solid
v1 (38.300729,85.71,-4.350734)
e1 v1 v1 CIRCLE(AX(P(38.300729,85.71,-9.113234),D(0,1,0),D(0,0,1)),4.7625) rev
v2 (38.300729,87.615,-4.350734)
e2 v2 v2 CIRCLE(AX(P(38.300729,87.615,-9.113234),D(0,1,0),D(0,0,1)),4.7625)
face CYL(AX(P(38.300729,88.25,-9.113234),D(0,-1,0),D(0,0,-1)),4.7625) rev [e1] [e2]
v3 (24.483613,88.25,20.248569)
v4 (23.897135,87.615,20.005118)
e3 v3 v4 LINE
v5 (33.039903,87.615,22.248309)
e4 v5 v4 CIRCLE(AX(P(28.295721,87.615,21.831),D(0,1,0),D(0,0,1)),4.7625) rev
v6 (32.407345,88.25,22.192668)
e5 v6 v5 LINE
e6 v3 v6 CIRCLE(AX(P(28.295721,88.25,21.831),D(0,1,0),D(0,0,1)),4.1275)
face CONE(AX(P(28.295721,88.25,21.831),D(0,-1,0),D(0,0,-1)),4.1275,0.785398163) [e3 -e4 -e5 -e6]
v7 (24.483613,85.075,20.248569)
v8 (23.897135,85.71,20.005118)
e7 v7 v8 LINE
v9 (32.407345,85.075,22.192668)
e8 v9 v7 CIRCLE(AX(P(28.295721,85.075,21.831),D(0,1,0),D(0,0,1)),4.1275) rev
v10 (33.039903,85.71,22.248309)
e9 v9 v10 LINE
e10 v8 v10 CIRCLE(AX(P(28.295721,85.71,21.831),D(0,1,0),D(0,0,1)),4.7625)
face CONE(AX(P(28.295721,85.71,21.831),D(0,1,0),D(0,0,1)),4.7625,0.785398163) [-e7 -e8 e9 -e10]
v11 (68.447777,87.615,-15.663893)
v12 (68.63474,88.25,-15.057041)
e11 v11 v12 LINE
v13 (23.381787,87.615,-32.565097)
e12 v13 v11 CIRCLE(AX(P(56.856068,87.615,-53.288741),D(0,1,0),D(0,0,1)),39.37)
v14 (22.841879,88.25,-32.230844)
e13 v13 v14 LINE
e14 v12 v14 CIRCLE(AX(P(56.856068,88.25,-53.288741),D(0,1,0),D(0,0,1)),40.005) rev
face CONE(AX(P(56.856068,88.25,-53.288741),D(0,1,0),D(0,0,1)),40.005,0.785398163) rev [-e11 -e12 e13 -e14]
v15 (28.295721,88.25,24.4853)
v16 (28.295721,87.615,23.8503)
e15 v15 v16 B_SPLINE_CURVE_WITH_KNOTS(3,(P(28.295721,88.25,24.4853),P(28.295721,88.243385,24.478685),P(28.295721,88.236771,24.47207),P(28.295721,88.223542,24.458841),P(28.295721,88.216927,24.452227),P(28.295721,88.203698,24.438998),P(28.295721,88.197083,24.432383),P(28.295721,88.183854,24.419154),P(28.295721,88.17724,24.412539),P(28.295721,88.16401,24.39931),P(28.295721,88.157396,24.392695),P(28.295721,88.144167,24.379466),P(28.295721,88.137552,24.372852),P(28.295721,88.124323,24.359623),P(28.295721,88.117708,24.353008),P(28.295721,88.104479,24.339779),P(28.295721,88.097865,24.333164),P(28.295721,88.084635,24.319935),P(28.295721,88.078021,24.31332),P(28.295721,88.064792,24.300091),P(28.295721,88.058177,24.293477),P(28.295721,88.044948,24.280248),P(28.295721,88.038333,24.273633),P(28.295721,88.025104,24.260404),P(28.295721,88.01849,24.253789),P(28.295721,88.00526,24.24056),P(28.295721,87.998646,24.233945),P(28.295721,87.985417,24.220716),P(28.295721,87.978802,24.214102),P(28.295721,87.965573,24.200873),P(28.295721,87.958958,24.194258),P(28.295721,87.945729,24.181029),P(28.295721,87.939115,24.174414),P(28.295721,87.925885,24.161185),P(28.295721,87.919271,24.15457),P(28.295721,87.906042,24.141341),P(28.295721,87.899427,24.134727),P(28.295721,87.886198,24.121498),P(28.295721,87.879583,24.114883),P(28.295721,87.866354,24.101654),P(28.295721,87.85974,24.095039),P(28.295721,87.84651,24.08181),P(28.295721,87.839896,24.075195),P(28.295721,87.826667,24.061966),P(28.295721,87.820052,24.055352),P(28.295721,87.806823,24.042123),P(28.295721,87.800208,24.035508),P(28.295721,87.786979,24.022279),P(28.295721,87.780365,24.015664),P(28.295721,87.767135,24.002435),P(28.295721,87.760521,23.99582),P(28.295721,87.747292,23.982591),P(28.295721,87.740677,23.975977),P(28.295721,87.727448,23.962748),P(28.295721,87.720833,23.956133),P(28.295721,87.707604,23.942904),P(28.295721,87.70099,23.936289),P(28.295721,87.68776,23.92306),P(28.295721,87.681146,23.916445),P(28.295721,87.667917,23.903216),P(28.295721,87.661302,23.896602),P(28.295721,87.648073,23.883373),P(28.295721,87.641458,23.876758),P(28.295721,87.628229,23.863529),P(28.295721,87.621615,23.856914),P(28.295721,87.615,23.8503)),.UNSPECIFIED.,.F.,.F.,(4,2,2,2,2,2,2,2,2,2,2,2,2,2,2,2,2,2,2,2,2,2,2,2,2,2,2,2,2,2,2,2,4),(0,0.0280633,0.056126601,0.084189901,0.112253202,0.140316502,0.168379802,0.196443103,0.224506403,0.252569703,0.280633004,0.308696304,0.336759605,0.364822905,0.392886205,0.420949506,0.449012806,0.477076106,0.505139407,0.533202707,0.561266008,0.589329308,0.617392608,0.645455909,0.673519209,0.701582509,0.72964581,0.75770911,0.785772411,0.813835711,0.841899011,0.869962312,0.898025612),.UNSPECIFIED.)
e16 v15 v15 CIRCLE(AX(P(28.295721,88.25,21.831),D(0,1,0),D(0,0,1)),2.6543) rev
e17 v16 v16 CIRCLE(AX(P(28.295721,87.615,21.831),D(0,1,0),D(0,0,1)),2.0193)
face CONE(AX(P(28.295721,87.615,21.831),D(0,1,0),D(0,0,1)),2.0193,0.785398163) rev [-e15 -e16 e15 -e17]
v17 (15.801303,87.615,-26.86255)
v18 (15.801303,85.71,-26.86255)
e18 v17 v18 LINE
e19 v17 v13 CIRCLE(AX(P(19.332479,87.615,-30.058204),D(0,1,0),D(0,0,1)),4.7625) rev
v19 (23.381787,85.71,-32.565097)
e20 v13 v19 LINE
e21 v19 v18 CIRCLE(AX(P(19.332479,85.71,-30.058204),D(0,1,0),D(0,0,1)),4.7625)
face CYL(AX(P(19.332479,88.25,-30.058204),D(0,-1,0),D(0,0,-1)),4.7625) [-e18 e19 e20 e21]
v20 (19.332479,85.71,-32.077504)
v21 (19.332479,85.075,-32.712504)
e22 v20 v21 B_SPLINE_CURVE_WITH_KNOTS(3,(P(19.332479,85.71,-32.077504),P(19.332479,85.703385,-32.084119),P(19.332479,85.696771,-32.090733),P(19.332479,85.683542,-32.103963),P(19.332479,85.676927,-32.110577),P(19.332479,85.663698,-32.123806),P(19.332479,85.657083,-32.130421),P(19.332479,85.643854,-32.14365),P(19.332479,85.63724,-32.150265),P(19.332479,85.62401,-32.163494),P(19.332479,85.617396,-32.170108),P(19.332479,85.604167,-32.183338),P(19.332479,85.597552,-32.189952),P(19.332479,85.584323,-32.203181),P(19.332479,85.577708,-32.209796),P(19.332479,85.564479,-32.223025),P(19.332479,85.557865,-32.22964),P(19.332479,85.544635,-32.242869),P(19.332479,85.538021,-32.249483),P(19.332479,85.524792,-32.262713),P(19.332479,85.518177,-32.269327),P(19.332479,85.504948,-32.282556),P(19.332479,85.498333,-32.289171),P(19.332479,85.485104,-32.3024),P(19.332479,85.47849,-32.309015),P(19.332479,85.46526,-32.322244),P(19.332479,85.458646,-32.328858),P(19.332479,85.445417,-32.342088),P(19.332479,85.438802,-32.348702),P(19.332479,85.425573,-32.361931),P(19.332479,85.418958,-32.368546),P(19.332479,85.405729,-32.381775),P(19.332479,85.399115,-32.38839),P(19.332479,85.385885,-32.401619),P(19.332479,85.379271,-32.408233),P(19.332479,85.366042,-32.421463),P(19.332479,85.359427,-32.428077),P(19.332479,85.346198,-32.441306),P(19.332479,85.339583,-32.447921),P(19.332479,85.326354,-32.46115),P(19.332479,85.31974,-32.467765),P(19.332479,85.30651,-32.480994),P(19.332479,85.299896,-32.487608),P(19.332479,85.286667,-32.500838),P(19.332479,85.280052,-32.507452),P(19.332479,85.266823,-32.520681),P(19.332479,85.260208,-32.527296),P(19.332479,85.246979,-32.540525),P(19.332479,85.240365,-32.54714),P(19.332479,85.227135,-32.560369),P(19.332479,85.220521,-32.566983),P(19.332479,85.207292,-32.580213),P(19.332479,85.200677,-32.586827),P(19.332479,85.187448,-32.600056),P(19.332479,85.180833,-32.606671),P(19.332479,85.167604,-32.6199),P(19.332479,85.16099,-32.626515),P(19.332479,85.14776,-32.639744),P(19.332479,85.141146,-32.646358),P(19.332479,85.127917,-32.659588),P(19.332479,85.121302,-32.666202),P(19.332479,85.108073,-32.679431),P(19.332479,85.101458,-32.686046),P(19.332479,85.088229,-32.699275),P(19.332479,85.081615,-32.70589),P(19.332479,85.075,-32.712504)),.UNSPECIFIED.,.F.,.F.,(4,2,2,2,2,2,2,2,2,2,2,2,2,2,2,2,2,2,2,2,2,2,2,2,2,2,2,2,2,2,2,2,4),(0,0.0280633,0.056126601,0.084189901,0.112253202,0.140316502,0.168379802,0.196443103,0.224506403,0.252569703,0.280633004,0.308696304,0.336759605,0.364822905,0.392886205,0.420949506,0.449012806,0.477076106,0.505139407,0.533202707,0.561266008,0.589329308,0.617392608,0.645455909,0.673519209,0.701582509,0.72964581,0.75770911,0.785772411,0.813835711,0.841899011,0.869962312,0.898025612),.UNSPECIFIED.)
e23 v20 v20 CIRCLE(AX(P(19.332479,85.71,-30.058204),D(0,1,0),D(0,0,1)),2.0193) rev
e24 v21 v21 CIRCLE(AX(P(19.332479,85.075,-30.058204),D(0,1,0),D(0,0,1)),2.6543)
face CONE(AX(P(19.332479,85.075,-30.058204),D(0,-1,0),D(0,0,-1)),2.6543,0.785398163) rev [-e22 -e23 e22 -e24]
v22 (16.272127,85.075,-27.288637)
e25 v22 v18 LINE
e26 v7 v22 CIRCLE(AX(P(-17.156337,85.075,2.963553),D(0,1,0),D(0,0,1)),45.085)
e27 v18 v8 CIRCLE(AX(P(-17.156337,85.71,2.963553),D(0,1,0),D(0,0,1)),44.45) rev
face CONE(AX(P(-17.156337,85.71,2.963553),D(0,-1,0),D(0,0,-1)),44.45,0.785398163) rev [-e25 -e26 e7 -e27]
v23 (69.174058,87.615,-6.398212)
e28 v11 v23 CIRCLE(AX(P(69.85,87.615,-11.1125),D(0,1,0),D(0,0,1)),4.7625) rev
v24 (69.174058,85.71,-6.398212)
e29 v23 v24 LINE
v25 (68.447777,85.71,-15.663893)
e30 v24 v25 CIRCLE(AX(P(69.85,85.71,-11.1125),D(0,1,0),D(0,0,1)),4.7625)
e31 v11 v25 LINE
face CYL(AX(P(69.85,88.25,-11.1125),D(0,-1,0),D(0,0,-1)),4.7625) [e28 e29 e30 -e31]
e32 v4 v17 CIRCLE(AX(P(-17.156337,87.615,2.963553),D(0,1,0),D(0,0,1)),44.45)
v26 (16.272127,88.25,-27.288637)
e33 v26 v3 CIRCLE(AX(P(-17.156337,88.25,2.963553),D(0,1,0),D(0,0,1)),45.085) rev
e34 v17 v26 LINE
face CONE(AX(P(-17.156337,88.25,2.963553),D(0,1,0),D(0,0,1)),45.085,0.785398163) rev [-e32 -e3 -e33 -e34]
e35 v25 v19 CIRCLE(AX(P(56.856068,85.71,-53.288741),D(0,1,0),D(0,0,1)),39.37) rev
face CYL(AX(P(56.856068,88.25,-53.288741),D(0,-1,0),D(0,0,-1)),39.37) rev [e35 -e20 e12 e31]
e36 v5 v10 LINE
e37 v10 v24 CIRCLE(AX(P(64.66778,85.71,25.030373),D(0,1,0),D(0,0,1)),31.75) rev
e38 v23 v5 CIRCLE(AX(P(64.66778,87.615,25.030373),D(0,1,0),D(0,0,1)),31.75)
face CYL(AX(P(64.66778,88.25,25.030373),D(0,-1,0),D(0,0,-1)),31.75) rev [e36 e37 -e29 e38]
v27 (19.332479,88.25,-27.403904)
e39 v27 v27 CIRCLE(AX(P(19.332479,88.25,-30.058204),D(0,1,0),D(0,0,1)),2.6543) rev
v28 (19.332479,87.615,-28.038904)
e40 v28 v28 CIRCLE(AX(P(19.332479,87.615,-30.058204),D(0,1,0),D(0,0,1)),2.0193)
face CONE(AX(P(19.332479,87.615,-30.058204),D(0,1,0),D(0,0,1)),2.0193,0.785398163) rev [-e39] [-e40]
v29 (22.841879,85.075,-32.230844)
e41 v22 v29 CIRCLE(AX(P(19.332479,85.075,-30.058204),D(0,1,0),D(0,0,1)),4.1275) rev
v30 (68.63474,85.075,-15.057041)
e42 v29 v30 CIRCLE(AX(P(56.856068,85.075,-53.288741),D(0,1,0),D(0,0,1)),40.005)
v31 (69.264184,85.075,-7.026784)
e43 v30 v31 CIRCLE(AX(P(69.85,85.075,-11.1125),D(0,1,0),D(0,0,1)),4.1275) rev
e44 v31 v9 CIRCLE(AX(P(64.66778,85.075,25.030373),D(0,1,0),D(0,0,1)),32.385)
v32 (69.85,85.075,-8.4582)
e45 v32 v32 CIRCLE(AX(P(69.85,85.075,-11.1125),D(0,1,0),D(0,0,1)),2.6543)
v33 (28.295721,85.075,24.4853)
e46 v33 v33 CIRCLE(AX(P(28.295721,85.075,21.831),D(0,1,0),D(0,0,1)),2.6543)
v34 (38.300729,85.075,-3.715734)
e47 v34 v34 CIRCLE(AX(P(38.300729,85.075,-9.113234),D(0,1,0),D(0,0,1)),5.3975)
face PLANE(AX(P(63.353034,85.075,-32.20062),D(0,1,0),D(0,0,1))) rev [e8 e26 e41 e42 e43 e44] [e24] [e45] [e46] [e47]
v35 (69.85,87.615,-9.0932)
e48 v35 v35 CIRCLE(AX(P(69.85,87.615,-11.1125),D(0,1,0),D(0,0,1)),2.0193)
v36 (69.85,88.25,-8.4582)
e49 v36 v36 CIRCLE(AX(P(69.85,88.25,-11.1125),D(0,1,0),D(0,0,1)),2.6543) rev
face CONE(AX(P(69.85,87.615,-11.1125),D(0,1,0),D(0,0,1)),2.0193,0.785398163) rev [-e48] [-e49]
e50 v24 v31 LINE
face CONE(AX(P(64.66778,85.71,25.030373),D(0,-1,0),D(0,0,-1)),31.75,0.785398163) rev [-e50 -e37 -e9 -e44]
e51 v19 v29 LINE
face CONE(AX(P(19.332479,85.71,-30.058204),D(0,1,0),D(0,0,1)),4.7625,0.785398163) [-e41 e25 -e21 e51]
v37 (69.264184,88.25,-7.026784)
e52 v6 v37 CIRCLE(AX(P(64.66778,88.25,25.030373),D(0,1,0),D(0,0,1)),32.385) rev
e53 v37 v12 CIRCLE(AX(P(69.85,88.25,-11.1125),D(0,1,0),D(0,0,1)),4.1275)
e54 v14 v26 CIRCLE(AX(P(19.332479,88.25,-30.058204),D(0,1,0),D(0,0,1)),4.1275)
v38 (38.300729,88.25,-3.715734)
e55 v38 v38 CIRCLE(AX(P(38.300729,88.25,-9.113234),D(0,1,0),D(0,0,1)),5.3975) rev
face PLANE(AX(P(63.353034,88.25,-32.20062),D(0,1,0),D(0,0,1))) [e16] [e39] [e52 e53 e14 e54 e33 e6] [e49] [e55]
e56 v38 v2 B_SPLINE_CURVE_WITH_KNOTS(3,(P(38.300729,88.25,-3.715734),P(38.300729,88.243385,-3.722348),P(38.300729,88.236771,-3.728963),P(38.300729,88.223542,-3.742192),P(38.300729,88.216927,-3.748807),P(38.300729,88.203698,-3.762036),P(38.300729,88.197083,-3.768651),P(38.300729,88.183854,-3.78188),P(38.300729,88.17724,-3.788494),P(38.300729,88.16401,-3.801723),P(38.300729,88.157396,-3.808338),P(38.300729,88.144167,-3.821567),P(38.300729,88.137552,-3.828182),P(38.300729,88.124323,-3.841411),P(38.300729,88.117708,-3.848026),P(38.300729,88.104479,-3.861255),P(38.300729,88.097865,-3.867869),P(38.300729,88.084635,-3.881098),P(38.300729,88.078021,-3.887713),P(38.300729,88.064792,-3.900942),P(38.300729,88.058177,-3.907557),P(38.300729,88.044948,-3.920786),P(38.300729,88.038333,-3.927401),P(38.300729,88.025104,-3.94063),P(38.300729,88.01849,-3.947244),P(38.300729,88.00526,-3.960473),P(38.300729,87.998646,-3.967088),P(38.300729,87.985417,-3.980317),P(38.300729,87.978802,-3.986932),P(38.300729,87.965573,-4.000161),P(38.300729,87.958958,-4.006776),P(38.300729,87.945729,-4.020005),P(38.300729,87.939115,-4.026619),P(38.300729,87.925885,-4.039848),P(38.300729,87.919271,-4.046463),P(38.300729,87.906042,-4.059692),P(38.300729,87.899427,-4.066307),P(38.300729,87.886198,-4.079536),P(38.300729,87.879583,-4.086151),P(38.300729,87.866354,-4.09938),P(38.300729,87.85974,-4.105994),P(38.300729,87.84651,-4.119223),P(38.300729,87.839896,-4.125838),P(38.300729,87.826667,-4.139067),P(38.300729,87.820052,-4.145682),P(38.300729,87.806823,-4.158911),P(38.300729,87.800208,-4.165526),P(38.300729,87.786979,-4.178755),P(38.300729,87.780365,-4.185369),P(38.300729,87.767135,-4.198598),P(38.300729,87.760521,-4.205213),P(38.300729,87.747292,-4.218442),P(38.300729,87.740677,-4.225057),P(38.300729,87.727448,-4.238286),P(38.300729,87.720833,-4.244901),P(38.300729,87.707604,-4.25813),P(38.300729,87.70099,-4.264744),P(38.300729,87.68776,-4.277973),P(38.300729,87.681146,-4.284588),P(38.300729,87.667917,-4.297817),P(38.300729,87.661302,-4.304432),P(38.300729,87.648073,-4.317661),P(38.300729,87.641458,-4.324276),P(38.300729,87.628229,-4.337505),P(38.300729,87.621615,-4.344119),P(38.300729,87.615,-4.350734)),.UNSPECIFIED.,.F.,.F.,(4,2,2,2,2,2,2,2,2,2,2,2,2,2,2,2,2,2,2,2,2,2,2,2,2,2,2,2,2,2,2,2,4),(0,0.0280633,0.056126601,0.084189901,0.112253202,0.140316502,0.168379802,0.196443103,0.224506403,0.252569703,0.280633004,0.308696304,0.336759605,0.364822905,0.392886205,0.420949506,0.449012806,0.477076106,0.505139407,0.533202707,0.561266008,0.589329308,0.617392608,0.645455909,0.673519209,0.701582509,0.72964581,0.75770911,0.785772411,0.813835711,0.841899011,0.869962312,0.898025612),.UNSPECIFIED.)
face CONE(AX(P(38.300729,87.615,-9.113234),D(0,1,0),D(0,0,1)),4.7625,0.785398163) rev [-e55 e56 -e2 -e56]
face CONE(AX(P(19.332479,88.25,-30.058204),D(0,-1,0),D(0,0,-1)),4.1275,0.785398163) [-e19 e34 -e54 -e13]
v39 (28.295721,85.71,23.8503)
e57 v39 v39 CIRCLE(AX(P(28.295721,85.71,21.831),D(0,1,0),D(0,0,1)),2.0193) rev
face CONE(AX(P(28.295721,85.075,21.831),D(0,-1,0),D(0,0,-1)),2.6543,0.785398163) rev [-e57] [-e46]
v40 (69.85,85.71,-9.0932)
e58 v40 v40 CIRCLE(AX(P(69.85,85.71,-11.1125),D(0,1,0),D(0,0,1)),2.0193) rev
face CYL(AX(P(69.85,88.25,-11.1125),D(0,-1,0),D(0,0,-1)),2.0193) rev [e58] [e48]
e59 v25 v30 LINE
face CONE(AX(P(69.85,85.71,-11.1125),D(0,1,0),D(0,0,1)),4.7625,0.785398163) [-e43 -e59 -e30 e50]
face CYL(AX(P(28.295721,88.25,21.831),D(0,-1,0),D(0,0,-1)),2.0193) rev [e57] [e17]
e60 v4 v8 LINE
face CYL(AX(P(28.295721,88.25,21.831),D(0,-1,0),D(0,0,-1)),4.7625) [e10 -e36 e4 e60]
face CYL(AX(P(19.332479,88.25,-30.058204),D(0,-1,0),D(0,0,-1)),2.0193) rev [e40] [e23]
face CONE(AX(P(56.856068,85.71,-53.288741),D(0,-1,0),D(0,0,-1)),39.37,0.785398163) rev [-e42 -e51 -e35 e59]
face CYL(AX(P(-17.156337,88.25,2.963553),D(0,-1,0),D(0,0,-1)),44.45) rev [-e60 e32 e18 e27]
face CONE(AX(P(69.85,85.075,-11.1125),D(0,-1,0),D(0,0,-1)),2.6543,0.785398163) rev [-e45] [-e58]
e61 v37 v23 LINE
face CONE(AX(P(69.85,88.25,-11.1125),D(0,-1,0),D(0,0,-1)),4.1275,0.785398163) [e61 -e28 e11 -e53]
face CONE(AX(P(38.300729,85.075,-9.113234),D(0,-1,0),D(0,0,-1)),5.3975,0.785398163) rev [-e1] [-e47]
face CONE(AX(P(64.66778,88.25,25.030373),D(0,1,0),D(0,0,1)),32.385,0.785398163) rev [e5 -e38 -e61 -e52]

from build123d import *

# Parameters (mm, degrees)
STOCK_TEATHERED_START                        = 85.075
STOCK_TEATHERED_SWERVE_OUTER_MODUAL_1_OU_R   = 2.0193
STOCK_TEATHERED_SWERVE_OUTER_MODUAL_1_OU_R_2 = 4.7625
STOCK_TEATHERED_SWERVE_OUTER_MODUAL_1_DEPTH  = 3.175
CHAMFER1_SIZE                                = 0.635


# Read off the part's stored shape, not the designer's step: Stock-Teathered Swerve Outer Modual-1
with BuildPart() as part:
    # Stock-Teathered Swerve Outer Modual-1 ou → Stock-Teathered Swerve Outer Modual-1 (new body)
    with BuildSketch(Plane(origin=(0, 0, 0), x_dir=(1, 0, 0), z_dir=(0, 1, 0)).offset(STOCK_TEATHERED_START)):
        with BuildLine():
            ThreePointArc((69.17405827, 6.398212246), (74.59793655, 11.484662283), (68.44777711, 15.663892887))
            ThreePointArc((68.44777711, 15.663892887), (43.031292772, 16.425853008), (23.381787081, 32.565096654))
            ThreePointArc((23.381787081, 32.565096654), (16.469460575, 33.864059213), (15.801303162, 26.862550296))
            ThreePointArc((15.801303162, 26.862550296), (26.644984318, 4.602603852), (23.897134883, -20.005117705))
            ThreePointArc((23.897134883, -20.005117705), (27.16089255, -26.456318028), (33.039902775, -22.248309176))
            ThreePointArc((33.039902775, -22.248309176), (44.943402215, -0.150432703), (69.17405827, 6.398212246))
        make_face()
        with Locations((28.295721181, -21.830999635)):
            Circle(STOCK_TEATHERED_SWERVE_OUTER_MODUAL_1_OU_R, mode=Mode.SUBTRACT)
        with Locations((38.300729341, 9.113233891)):
            Circle(STOCK_TEATHERED_SWERVE_OUTER_MODUAL_1_OU_R_2, mode=Mode.SUBTRACT)
        with Locations((19.332478919, 30.058204223)):
            Circle(STOCK_TEATHERED_SWERVE_OUTER_MODUAL_1_OU_R, mode=Mode.SUBTRACT)
        with Locations((69.85, 11.1125)):
            Circle(STOCK_TEATHERED_SWERVE_OUTER_MODUAL_1_OU_R, mode=Mode.SUBTRACT)
    extrude(amount=STOCK_TEATHERED_SWERVE_OUTER_MODUAL_1_DEPTH)

    # Chamfer1
    chamfer1_edges = [part.edges().sort_by_distance(p)[0] for p in [
        (26.644984318, 88.25, -4.602603852),
        (27.16089255, 88.25, 26.456318028),
        (33.538229341, 85.075, -9.113233891),
        (33.538229341, 88.25, -9.113233891),
        (26.276421181, 85.075, 21.830999635),
        (44.943402215, 88.25, 0.150432703),
        (26.276421181, 88.25, 21.830999635),
        (67.8307, 85.075, -11.1125),
        (74.59793655, 88.25, -11.484662283),
        (67.8307, 88.25, -11.1125),
        (17.313178919, 85.075, -30.058204223),
        (17.313178919, 88.25, -30.058204223),
        (43.031292772, 88.25, -16.425853008),
        (74.59793655, 85.075, -11.484662283),
        (44.943402215, 85.075, 0.150432703),
        (27.16089255, 85.075, 26.456318028),
        (26.644984318, 85.075, -4.602603852),
        (16.469460575, 85.075, -33.864059213),
        (43.031292772, 85.075, -16.425853008),
        (16.469460575, 88.25, -33.864059213),
    ]]
    chamfer(chamfer1_edges, length=CHAMFER1_SIZE)


solid = part.part
